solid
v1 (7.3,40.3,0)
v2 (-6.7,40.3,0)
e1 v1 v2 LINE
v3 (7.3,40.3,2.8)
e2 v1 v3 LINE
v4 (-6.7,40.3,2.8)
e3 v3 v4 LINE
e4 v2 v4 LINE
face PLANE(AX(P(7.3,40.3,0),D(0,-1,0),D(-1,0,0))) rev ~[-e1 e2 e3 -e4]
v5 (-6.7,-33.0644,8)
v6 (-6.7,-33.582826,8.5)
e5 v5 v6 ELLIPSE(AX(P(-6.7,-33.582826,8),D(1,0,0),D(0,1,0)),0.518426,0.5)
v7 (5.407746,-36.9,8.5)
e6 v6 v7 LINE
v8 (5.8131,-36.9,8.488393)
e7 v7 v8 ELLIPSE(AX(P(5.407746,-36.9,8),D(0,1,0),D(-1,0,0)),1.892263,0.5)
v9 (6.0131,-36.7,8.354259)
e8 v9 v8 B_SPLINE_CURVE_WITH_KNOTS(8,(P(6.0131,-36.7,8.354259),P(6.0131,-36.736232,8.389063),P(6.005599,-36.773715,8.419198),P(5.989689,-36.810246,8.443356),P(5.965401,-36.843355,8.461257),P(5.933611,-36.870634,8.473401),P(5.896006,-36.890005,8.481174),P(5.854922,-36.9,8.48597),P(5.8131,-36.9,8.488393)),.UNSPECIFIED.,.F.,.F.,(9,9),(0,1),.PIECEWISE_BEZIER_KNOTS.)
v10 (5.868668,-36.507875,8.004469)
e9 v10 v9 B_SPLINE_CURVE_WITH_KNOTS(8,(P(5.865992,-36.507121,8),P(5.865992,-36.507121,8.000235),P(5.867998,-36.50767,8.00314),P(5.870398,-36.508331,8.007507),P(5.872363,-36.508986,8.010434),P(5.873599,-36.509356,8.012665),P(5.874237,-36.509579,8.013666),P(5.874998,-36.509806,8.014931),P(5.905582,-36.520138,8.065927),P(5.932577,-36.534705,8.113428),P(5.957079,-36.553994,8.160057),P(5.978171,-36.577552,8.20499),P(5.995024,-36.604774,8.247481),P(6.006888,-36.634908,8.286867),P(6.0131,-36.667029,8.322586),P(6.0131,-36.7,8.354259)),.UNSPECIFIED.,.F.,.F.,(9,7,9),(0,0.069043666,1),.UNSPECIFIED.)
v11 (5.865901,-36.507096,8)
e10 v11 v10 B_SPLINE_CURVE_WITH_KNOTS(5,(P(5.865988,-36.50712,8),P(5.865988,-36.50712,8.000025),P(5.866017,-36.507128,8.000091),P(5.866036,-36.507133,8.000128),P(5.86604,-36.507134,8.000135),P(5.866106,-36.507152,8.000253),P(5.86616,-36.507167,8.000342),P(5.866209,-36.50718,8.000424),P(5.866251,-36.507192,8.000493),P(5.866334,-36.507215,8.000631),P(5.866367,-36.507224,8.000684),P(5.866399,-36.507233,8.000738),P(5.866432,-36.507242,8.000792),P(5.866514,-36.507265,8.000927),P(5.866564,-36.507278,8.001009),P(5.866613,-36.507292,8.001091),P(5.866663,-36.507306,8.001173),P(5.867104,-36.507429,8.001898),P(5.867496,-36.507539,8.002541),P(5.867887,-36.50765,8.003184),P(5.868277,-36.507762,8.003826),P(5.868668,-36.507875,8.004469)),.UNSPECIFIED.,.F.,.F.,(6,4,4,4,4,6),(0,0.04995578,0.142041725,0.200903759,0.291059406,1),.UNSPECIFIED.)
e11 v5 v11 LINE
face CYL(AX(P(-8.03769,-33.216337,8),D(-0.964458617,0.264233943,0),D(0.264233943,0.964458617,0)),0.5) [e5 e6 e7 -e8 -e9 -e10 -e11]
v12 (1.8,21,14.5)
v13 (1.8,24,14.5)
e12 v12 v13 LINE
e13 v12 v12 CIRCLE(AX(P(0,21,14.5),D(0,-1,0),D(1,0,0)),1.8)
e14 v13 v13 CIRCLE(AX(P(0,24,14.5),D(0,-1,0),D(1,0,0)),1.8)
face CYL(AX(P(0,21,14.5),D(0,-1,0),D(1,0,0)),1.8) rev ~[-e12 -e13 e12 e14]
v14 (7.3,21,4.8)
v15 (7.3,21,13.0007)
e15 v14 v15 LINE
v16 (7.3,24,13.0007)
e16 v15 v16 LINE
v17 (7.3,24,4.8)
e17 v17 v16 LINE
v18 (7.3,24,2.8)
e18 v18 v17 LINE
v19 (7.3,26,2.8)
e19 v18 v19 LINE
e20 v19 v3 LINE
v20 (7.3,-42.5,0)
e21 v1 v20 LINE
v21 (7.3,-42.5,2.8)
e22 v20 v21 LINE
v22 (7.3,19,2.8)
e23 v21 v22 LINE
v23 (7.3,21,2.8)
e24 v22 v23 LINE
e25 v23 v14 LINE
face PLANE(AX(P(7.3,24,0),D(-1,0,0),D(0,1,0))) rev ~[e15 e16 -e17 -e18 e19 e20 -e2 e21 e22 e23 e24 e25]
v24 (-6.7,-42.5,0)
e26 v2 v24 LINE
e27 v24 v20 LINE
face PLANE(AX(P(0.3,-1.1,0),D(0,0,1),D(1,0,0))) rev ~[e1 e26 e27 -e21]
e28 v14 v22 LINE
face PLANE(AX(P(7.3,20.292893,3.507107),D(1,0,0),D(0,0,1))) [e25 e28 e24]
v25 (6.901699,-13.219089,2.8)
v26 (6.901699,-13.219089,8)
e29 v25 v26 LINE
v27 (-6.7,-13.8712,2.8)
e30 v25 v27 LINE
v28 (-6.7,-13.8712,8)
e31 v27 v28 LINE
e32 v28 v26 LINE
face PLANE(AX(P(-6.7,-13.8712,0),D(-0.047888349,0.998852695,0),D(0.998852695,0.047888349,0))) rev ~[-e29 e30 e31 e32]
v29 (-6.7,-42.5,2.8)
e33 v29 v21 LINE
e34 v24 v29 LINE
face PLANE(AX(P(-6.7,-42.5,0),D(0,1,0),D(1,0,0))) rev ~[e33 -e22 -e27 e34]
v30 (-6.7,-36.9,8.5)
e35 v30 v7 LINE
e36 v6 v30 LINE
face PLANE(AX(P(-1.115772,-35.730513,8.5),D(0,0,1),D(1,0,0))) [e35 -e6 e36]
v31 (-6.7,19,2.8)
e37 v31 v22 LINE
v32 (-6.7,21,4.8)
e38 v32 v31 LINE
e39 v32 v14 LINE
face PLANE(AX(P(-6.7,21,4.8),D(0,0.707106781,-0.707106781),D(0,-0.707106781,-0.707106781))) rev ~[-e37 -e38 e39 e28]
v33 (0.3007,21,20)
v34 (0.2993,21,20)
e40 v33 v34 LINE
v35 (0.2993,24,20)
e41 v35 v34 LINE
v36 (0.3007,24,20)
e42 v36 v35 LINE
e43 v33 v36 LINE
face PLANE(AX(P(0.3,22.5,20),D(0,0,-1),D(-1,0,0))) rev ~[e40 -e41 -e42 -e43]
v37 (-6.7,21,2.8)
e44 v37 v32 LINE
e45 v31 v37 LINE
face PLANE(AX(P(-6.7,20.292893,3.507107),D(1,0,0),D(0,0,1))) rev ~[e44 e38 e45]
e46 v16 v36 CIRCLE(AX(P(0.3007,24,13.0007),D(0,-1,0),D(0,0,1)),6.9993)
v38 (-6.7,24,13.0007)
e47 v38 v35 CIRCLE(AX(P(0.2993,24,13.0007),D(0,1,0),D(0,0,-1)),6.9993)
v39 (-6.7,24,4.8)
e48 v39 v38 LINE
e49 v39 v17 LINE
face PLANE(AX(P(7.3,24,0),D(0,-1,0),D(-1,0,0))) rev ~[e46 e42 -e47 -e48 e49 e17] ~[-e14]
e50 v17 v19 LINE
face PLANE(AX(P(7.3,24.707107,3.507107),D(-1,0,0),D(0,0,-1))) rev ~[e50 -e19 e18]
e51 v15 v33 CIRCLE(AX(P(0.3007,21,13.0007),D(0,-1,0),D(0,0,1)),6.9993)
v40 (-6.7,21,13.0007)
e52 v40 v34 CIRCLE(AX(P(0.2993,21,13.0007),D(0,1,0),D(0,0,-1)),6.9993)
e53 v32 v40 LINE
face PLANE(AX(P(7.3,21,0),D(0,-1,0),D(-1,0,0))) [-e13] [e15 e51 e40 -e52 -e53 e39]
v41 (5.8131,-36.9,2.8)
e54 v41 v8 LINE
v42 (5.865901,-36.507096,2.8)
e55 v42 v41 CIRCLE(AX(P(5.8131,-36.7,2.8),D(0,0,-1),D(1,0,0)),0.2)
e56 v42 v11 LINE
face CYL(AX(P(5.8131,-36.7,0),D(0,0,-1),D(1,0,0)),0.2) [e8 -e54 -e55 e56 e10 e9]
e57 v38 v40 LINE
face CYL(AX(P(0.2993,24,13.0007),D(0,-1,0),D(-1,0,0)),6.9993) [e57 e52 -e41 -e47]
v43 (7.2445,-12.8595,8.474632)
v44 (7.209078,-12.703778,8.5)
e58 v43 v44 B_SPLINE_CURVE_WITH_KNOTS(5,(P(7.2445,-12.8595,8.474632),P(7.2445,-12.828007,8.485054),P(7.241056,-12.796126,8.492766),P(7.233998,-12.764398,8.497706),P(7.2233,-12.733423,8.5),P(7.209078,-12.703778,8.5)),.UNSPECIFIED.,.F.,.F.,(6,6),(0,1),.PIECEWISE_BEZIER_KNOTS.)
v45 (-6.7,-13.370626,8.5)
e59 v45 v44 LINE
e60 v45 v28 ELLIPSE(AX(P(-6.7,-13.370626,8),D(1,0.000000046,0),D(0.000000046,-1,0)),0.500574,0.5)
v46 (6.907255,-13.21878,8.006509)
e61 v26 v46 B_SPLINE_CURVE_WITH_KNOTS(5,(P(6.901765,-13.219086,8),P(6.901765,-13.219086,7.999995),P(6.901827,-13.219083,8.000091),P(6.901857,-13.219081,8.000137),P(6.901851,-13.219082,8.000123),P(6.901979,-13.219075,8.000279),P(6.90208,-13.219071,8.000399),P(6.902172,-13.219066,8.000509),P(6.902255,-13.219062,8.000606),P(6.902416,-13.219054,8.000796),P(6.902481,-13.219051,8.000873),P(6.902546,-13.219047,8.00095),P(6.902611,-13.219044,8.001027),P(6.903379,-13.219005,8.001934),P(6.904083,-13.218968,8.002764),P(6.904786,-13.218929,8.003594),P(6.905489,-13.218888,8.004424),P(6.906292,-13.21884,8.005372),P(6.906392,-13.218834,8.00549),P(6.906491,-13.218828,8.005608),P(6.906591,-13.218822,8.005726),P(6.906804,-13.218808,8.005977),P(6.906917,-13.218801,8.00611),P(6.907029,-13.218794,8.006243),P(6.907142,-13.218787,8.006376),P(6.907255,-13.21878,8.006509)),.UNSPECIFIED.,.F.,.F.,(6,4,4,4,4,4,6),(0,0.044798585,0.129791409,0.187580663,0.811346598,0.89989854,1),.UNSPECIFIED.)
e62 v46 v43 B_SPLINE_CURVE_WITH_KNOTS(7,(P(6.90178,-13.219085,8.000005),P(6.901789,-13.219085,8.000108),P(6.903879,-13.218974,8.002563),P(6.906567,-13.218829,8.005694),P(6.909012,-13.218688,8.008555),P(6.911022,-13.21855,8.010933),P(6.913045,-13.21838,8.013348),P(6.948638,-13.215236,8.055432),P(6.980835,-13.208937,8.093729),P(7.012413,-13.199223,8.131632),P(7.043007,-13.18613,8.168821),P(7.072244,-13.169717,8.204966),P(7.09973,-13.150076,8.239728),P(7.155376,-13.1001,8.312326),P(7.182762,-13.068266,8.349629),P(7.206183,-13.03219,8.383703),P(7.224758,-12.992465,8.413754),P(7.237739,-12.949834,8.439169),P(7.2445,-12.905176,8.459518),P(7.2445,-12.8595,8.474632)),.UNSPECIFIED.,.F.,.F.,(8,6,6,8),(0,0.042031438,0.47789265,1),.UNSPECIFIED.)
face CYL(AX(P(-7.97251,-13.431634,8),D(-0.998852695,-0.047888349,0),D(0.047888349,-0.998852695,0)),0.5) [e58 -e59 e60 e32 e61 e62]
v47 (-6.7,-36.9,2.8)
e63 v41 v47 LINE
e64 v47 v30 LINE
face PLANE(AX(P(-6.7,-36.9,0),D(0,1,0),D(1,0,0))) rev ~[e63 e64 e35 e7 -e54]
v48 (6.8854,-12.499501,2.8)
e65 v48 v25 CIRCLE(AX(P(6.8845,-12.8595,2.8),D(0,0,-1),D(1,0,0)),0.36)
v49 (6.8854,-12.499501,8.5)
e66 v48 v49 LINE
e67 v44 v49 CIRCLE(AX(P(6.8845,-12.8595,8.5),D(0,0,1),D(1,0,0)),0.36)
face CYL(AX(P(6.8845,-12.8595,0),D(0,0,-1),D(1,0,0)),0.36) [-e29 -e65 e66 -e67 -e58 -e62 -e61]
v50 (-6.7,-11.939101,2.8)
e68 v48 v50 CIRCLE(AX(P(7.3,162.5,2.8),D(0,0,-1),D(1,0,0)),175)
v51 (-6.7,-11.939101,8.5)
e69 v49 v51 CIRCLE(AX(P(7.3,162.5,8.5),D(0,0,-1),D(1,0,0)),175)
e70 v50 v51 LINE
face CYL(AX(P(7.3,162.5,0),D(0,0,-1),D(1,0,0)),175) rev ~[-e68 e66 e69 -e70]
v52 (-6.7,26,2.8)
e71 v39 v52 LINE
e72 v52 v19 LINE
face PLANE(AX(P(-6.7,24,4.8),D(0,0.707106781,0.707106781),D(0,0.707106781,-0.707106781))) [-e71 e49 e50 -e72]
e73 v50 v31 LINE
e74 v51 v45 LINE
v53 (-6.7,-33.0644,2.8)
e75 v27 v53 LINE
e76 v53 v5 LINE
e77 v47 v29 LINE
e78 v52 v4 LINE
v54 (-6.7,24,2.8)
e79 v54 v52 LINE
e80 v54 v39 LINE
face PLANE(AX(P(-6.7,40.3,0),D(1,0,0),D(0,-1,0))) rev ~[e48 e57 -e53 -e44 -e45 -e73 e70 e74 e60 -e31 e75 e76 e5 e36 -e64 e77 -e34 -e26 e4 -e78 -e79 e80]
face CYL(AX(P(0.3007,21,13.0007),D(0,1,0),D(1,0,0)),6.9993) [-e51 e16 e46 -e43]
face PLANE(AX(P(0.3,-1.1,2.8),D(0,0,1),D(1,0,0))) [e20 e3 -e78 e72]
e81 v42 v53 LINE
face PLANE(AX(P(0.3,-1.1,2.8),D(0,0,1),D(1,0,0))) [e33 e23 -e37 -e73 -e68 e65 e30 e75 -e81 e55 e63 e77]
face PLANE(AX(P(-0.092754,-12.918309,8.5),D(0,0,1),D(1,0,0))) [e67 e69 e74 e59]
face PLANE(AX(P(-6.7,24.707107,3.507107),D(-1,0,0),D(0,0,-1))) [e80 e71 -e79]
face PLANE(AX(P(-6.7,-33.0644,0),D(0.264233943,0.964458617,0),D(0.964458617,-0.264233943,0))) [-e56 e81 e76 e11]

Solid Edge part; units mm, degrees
sketch "Sketch1" plane through (0, 0, 0) normal (0, 0, 1) x (1, 0, 0)
  line L0 (-6.7, 40.3) -> (-6.7, 24)
  line L1 (-6.7, 24) -> (-6.7, 21)
  line L2 (-6.7, 21) -> (-6.7, -11.9391)
  line L3 (-6.7, -11.9391) -> (-6.7, -13.8712)
  line L4 (-6.7, -13.8712) -> (-6.7, -33.0644)
  line L5 (-6.7, -33.0644) -> (-6.7, -36.9)
  line L6 (-6.7, -36.9) -> (-6.7, -42.5)
  line L7 (-6.7, -42.5) -> (7.3, -42.5)
  line L8 (7.3, -42.5) -> (7.3, 21)
  line L9 (7.3, 21) -> (7.3, 24)
  line L10 (7.3, 24) -> (7.3, 40.3)
  line L11 (7.3, 40.3) -> (-6.7, 40.3)
extrude "Protrusion1" add sketch "Sketch1" along normal blind 2.8
sketch "Sketch2" plane through (0, 0, 0) normal (0, 0, 1) x (1, 0, 0)
  line L0 (-6.7, -13.8712) -> (6.9017, -13.2191)
  arc A0 (6.9017, -13.2191) -> (6.8854, -12.4995) centre (6.8845, -12.8595) ccw
  arc A1 (6.8854, -12.4995) -> (-6.7, -11.9391) centre (7.3, 162.5) cw
  line L1 (-6.7, -11.9391) -> (-6.7, -13.8712)
  line L2 (-6.7, -36.9) -> (5.8131, -36.9)
  arc A2 (5.8659, -36.5071) -> (5.8131, -36.9) centre (5.8131, -36.7) cw
  line L3 (-6.7, -33.0644) -> (5.8659, -36.5071)
  line L4 (-6.7, -33.0644) -> (-6.7, -36.9)
extrude "ExtrudedProtrusion_2" add sketch "Sketch2" along normal blind 8.5
sketch "Sketch3" plane through (0, 0, 0) normal (0, 0, 1) x (1, 0, 0)
  line L0 (7.3, 21) -> (-6.7, 21)
  line L1 (-6.7, 24) -> (-6.7, 21)
  line L2 (7.3, 24) -> (-6.7, 24)
  line L3 (7.3, 21) -> (7.3, 24)
extrude "ExtrudedProtrusion_3" add sketch "Sketch3" along normal blind 20
fillet "Round_1" radius 7 2 edges at (7.3, 22.5, 20) (-6.7, 22.5, 20)
fillet "Round_2" radius 0.5 2 edges at (0.1009, -13.5452, 8.5) (-0.417, -34.7857, 8.5)
sketch "Sketch4" plane through (0, 21, 11.4) normal (0, -1, 0) x (1, 0, 0)
  circle A0 centre (0, 3.1) radius 1.8
extrude "ExtrudedCutout_1" cut sketch "Sketch4" against normal blind 3
chamfer "Chamfer_1" distance 2 angle 45 2 edges at (0.3, 21, 2.8) (0.3, 24, 2.8)
